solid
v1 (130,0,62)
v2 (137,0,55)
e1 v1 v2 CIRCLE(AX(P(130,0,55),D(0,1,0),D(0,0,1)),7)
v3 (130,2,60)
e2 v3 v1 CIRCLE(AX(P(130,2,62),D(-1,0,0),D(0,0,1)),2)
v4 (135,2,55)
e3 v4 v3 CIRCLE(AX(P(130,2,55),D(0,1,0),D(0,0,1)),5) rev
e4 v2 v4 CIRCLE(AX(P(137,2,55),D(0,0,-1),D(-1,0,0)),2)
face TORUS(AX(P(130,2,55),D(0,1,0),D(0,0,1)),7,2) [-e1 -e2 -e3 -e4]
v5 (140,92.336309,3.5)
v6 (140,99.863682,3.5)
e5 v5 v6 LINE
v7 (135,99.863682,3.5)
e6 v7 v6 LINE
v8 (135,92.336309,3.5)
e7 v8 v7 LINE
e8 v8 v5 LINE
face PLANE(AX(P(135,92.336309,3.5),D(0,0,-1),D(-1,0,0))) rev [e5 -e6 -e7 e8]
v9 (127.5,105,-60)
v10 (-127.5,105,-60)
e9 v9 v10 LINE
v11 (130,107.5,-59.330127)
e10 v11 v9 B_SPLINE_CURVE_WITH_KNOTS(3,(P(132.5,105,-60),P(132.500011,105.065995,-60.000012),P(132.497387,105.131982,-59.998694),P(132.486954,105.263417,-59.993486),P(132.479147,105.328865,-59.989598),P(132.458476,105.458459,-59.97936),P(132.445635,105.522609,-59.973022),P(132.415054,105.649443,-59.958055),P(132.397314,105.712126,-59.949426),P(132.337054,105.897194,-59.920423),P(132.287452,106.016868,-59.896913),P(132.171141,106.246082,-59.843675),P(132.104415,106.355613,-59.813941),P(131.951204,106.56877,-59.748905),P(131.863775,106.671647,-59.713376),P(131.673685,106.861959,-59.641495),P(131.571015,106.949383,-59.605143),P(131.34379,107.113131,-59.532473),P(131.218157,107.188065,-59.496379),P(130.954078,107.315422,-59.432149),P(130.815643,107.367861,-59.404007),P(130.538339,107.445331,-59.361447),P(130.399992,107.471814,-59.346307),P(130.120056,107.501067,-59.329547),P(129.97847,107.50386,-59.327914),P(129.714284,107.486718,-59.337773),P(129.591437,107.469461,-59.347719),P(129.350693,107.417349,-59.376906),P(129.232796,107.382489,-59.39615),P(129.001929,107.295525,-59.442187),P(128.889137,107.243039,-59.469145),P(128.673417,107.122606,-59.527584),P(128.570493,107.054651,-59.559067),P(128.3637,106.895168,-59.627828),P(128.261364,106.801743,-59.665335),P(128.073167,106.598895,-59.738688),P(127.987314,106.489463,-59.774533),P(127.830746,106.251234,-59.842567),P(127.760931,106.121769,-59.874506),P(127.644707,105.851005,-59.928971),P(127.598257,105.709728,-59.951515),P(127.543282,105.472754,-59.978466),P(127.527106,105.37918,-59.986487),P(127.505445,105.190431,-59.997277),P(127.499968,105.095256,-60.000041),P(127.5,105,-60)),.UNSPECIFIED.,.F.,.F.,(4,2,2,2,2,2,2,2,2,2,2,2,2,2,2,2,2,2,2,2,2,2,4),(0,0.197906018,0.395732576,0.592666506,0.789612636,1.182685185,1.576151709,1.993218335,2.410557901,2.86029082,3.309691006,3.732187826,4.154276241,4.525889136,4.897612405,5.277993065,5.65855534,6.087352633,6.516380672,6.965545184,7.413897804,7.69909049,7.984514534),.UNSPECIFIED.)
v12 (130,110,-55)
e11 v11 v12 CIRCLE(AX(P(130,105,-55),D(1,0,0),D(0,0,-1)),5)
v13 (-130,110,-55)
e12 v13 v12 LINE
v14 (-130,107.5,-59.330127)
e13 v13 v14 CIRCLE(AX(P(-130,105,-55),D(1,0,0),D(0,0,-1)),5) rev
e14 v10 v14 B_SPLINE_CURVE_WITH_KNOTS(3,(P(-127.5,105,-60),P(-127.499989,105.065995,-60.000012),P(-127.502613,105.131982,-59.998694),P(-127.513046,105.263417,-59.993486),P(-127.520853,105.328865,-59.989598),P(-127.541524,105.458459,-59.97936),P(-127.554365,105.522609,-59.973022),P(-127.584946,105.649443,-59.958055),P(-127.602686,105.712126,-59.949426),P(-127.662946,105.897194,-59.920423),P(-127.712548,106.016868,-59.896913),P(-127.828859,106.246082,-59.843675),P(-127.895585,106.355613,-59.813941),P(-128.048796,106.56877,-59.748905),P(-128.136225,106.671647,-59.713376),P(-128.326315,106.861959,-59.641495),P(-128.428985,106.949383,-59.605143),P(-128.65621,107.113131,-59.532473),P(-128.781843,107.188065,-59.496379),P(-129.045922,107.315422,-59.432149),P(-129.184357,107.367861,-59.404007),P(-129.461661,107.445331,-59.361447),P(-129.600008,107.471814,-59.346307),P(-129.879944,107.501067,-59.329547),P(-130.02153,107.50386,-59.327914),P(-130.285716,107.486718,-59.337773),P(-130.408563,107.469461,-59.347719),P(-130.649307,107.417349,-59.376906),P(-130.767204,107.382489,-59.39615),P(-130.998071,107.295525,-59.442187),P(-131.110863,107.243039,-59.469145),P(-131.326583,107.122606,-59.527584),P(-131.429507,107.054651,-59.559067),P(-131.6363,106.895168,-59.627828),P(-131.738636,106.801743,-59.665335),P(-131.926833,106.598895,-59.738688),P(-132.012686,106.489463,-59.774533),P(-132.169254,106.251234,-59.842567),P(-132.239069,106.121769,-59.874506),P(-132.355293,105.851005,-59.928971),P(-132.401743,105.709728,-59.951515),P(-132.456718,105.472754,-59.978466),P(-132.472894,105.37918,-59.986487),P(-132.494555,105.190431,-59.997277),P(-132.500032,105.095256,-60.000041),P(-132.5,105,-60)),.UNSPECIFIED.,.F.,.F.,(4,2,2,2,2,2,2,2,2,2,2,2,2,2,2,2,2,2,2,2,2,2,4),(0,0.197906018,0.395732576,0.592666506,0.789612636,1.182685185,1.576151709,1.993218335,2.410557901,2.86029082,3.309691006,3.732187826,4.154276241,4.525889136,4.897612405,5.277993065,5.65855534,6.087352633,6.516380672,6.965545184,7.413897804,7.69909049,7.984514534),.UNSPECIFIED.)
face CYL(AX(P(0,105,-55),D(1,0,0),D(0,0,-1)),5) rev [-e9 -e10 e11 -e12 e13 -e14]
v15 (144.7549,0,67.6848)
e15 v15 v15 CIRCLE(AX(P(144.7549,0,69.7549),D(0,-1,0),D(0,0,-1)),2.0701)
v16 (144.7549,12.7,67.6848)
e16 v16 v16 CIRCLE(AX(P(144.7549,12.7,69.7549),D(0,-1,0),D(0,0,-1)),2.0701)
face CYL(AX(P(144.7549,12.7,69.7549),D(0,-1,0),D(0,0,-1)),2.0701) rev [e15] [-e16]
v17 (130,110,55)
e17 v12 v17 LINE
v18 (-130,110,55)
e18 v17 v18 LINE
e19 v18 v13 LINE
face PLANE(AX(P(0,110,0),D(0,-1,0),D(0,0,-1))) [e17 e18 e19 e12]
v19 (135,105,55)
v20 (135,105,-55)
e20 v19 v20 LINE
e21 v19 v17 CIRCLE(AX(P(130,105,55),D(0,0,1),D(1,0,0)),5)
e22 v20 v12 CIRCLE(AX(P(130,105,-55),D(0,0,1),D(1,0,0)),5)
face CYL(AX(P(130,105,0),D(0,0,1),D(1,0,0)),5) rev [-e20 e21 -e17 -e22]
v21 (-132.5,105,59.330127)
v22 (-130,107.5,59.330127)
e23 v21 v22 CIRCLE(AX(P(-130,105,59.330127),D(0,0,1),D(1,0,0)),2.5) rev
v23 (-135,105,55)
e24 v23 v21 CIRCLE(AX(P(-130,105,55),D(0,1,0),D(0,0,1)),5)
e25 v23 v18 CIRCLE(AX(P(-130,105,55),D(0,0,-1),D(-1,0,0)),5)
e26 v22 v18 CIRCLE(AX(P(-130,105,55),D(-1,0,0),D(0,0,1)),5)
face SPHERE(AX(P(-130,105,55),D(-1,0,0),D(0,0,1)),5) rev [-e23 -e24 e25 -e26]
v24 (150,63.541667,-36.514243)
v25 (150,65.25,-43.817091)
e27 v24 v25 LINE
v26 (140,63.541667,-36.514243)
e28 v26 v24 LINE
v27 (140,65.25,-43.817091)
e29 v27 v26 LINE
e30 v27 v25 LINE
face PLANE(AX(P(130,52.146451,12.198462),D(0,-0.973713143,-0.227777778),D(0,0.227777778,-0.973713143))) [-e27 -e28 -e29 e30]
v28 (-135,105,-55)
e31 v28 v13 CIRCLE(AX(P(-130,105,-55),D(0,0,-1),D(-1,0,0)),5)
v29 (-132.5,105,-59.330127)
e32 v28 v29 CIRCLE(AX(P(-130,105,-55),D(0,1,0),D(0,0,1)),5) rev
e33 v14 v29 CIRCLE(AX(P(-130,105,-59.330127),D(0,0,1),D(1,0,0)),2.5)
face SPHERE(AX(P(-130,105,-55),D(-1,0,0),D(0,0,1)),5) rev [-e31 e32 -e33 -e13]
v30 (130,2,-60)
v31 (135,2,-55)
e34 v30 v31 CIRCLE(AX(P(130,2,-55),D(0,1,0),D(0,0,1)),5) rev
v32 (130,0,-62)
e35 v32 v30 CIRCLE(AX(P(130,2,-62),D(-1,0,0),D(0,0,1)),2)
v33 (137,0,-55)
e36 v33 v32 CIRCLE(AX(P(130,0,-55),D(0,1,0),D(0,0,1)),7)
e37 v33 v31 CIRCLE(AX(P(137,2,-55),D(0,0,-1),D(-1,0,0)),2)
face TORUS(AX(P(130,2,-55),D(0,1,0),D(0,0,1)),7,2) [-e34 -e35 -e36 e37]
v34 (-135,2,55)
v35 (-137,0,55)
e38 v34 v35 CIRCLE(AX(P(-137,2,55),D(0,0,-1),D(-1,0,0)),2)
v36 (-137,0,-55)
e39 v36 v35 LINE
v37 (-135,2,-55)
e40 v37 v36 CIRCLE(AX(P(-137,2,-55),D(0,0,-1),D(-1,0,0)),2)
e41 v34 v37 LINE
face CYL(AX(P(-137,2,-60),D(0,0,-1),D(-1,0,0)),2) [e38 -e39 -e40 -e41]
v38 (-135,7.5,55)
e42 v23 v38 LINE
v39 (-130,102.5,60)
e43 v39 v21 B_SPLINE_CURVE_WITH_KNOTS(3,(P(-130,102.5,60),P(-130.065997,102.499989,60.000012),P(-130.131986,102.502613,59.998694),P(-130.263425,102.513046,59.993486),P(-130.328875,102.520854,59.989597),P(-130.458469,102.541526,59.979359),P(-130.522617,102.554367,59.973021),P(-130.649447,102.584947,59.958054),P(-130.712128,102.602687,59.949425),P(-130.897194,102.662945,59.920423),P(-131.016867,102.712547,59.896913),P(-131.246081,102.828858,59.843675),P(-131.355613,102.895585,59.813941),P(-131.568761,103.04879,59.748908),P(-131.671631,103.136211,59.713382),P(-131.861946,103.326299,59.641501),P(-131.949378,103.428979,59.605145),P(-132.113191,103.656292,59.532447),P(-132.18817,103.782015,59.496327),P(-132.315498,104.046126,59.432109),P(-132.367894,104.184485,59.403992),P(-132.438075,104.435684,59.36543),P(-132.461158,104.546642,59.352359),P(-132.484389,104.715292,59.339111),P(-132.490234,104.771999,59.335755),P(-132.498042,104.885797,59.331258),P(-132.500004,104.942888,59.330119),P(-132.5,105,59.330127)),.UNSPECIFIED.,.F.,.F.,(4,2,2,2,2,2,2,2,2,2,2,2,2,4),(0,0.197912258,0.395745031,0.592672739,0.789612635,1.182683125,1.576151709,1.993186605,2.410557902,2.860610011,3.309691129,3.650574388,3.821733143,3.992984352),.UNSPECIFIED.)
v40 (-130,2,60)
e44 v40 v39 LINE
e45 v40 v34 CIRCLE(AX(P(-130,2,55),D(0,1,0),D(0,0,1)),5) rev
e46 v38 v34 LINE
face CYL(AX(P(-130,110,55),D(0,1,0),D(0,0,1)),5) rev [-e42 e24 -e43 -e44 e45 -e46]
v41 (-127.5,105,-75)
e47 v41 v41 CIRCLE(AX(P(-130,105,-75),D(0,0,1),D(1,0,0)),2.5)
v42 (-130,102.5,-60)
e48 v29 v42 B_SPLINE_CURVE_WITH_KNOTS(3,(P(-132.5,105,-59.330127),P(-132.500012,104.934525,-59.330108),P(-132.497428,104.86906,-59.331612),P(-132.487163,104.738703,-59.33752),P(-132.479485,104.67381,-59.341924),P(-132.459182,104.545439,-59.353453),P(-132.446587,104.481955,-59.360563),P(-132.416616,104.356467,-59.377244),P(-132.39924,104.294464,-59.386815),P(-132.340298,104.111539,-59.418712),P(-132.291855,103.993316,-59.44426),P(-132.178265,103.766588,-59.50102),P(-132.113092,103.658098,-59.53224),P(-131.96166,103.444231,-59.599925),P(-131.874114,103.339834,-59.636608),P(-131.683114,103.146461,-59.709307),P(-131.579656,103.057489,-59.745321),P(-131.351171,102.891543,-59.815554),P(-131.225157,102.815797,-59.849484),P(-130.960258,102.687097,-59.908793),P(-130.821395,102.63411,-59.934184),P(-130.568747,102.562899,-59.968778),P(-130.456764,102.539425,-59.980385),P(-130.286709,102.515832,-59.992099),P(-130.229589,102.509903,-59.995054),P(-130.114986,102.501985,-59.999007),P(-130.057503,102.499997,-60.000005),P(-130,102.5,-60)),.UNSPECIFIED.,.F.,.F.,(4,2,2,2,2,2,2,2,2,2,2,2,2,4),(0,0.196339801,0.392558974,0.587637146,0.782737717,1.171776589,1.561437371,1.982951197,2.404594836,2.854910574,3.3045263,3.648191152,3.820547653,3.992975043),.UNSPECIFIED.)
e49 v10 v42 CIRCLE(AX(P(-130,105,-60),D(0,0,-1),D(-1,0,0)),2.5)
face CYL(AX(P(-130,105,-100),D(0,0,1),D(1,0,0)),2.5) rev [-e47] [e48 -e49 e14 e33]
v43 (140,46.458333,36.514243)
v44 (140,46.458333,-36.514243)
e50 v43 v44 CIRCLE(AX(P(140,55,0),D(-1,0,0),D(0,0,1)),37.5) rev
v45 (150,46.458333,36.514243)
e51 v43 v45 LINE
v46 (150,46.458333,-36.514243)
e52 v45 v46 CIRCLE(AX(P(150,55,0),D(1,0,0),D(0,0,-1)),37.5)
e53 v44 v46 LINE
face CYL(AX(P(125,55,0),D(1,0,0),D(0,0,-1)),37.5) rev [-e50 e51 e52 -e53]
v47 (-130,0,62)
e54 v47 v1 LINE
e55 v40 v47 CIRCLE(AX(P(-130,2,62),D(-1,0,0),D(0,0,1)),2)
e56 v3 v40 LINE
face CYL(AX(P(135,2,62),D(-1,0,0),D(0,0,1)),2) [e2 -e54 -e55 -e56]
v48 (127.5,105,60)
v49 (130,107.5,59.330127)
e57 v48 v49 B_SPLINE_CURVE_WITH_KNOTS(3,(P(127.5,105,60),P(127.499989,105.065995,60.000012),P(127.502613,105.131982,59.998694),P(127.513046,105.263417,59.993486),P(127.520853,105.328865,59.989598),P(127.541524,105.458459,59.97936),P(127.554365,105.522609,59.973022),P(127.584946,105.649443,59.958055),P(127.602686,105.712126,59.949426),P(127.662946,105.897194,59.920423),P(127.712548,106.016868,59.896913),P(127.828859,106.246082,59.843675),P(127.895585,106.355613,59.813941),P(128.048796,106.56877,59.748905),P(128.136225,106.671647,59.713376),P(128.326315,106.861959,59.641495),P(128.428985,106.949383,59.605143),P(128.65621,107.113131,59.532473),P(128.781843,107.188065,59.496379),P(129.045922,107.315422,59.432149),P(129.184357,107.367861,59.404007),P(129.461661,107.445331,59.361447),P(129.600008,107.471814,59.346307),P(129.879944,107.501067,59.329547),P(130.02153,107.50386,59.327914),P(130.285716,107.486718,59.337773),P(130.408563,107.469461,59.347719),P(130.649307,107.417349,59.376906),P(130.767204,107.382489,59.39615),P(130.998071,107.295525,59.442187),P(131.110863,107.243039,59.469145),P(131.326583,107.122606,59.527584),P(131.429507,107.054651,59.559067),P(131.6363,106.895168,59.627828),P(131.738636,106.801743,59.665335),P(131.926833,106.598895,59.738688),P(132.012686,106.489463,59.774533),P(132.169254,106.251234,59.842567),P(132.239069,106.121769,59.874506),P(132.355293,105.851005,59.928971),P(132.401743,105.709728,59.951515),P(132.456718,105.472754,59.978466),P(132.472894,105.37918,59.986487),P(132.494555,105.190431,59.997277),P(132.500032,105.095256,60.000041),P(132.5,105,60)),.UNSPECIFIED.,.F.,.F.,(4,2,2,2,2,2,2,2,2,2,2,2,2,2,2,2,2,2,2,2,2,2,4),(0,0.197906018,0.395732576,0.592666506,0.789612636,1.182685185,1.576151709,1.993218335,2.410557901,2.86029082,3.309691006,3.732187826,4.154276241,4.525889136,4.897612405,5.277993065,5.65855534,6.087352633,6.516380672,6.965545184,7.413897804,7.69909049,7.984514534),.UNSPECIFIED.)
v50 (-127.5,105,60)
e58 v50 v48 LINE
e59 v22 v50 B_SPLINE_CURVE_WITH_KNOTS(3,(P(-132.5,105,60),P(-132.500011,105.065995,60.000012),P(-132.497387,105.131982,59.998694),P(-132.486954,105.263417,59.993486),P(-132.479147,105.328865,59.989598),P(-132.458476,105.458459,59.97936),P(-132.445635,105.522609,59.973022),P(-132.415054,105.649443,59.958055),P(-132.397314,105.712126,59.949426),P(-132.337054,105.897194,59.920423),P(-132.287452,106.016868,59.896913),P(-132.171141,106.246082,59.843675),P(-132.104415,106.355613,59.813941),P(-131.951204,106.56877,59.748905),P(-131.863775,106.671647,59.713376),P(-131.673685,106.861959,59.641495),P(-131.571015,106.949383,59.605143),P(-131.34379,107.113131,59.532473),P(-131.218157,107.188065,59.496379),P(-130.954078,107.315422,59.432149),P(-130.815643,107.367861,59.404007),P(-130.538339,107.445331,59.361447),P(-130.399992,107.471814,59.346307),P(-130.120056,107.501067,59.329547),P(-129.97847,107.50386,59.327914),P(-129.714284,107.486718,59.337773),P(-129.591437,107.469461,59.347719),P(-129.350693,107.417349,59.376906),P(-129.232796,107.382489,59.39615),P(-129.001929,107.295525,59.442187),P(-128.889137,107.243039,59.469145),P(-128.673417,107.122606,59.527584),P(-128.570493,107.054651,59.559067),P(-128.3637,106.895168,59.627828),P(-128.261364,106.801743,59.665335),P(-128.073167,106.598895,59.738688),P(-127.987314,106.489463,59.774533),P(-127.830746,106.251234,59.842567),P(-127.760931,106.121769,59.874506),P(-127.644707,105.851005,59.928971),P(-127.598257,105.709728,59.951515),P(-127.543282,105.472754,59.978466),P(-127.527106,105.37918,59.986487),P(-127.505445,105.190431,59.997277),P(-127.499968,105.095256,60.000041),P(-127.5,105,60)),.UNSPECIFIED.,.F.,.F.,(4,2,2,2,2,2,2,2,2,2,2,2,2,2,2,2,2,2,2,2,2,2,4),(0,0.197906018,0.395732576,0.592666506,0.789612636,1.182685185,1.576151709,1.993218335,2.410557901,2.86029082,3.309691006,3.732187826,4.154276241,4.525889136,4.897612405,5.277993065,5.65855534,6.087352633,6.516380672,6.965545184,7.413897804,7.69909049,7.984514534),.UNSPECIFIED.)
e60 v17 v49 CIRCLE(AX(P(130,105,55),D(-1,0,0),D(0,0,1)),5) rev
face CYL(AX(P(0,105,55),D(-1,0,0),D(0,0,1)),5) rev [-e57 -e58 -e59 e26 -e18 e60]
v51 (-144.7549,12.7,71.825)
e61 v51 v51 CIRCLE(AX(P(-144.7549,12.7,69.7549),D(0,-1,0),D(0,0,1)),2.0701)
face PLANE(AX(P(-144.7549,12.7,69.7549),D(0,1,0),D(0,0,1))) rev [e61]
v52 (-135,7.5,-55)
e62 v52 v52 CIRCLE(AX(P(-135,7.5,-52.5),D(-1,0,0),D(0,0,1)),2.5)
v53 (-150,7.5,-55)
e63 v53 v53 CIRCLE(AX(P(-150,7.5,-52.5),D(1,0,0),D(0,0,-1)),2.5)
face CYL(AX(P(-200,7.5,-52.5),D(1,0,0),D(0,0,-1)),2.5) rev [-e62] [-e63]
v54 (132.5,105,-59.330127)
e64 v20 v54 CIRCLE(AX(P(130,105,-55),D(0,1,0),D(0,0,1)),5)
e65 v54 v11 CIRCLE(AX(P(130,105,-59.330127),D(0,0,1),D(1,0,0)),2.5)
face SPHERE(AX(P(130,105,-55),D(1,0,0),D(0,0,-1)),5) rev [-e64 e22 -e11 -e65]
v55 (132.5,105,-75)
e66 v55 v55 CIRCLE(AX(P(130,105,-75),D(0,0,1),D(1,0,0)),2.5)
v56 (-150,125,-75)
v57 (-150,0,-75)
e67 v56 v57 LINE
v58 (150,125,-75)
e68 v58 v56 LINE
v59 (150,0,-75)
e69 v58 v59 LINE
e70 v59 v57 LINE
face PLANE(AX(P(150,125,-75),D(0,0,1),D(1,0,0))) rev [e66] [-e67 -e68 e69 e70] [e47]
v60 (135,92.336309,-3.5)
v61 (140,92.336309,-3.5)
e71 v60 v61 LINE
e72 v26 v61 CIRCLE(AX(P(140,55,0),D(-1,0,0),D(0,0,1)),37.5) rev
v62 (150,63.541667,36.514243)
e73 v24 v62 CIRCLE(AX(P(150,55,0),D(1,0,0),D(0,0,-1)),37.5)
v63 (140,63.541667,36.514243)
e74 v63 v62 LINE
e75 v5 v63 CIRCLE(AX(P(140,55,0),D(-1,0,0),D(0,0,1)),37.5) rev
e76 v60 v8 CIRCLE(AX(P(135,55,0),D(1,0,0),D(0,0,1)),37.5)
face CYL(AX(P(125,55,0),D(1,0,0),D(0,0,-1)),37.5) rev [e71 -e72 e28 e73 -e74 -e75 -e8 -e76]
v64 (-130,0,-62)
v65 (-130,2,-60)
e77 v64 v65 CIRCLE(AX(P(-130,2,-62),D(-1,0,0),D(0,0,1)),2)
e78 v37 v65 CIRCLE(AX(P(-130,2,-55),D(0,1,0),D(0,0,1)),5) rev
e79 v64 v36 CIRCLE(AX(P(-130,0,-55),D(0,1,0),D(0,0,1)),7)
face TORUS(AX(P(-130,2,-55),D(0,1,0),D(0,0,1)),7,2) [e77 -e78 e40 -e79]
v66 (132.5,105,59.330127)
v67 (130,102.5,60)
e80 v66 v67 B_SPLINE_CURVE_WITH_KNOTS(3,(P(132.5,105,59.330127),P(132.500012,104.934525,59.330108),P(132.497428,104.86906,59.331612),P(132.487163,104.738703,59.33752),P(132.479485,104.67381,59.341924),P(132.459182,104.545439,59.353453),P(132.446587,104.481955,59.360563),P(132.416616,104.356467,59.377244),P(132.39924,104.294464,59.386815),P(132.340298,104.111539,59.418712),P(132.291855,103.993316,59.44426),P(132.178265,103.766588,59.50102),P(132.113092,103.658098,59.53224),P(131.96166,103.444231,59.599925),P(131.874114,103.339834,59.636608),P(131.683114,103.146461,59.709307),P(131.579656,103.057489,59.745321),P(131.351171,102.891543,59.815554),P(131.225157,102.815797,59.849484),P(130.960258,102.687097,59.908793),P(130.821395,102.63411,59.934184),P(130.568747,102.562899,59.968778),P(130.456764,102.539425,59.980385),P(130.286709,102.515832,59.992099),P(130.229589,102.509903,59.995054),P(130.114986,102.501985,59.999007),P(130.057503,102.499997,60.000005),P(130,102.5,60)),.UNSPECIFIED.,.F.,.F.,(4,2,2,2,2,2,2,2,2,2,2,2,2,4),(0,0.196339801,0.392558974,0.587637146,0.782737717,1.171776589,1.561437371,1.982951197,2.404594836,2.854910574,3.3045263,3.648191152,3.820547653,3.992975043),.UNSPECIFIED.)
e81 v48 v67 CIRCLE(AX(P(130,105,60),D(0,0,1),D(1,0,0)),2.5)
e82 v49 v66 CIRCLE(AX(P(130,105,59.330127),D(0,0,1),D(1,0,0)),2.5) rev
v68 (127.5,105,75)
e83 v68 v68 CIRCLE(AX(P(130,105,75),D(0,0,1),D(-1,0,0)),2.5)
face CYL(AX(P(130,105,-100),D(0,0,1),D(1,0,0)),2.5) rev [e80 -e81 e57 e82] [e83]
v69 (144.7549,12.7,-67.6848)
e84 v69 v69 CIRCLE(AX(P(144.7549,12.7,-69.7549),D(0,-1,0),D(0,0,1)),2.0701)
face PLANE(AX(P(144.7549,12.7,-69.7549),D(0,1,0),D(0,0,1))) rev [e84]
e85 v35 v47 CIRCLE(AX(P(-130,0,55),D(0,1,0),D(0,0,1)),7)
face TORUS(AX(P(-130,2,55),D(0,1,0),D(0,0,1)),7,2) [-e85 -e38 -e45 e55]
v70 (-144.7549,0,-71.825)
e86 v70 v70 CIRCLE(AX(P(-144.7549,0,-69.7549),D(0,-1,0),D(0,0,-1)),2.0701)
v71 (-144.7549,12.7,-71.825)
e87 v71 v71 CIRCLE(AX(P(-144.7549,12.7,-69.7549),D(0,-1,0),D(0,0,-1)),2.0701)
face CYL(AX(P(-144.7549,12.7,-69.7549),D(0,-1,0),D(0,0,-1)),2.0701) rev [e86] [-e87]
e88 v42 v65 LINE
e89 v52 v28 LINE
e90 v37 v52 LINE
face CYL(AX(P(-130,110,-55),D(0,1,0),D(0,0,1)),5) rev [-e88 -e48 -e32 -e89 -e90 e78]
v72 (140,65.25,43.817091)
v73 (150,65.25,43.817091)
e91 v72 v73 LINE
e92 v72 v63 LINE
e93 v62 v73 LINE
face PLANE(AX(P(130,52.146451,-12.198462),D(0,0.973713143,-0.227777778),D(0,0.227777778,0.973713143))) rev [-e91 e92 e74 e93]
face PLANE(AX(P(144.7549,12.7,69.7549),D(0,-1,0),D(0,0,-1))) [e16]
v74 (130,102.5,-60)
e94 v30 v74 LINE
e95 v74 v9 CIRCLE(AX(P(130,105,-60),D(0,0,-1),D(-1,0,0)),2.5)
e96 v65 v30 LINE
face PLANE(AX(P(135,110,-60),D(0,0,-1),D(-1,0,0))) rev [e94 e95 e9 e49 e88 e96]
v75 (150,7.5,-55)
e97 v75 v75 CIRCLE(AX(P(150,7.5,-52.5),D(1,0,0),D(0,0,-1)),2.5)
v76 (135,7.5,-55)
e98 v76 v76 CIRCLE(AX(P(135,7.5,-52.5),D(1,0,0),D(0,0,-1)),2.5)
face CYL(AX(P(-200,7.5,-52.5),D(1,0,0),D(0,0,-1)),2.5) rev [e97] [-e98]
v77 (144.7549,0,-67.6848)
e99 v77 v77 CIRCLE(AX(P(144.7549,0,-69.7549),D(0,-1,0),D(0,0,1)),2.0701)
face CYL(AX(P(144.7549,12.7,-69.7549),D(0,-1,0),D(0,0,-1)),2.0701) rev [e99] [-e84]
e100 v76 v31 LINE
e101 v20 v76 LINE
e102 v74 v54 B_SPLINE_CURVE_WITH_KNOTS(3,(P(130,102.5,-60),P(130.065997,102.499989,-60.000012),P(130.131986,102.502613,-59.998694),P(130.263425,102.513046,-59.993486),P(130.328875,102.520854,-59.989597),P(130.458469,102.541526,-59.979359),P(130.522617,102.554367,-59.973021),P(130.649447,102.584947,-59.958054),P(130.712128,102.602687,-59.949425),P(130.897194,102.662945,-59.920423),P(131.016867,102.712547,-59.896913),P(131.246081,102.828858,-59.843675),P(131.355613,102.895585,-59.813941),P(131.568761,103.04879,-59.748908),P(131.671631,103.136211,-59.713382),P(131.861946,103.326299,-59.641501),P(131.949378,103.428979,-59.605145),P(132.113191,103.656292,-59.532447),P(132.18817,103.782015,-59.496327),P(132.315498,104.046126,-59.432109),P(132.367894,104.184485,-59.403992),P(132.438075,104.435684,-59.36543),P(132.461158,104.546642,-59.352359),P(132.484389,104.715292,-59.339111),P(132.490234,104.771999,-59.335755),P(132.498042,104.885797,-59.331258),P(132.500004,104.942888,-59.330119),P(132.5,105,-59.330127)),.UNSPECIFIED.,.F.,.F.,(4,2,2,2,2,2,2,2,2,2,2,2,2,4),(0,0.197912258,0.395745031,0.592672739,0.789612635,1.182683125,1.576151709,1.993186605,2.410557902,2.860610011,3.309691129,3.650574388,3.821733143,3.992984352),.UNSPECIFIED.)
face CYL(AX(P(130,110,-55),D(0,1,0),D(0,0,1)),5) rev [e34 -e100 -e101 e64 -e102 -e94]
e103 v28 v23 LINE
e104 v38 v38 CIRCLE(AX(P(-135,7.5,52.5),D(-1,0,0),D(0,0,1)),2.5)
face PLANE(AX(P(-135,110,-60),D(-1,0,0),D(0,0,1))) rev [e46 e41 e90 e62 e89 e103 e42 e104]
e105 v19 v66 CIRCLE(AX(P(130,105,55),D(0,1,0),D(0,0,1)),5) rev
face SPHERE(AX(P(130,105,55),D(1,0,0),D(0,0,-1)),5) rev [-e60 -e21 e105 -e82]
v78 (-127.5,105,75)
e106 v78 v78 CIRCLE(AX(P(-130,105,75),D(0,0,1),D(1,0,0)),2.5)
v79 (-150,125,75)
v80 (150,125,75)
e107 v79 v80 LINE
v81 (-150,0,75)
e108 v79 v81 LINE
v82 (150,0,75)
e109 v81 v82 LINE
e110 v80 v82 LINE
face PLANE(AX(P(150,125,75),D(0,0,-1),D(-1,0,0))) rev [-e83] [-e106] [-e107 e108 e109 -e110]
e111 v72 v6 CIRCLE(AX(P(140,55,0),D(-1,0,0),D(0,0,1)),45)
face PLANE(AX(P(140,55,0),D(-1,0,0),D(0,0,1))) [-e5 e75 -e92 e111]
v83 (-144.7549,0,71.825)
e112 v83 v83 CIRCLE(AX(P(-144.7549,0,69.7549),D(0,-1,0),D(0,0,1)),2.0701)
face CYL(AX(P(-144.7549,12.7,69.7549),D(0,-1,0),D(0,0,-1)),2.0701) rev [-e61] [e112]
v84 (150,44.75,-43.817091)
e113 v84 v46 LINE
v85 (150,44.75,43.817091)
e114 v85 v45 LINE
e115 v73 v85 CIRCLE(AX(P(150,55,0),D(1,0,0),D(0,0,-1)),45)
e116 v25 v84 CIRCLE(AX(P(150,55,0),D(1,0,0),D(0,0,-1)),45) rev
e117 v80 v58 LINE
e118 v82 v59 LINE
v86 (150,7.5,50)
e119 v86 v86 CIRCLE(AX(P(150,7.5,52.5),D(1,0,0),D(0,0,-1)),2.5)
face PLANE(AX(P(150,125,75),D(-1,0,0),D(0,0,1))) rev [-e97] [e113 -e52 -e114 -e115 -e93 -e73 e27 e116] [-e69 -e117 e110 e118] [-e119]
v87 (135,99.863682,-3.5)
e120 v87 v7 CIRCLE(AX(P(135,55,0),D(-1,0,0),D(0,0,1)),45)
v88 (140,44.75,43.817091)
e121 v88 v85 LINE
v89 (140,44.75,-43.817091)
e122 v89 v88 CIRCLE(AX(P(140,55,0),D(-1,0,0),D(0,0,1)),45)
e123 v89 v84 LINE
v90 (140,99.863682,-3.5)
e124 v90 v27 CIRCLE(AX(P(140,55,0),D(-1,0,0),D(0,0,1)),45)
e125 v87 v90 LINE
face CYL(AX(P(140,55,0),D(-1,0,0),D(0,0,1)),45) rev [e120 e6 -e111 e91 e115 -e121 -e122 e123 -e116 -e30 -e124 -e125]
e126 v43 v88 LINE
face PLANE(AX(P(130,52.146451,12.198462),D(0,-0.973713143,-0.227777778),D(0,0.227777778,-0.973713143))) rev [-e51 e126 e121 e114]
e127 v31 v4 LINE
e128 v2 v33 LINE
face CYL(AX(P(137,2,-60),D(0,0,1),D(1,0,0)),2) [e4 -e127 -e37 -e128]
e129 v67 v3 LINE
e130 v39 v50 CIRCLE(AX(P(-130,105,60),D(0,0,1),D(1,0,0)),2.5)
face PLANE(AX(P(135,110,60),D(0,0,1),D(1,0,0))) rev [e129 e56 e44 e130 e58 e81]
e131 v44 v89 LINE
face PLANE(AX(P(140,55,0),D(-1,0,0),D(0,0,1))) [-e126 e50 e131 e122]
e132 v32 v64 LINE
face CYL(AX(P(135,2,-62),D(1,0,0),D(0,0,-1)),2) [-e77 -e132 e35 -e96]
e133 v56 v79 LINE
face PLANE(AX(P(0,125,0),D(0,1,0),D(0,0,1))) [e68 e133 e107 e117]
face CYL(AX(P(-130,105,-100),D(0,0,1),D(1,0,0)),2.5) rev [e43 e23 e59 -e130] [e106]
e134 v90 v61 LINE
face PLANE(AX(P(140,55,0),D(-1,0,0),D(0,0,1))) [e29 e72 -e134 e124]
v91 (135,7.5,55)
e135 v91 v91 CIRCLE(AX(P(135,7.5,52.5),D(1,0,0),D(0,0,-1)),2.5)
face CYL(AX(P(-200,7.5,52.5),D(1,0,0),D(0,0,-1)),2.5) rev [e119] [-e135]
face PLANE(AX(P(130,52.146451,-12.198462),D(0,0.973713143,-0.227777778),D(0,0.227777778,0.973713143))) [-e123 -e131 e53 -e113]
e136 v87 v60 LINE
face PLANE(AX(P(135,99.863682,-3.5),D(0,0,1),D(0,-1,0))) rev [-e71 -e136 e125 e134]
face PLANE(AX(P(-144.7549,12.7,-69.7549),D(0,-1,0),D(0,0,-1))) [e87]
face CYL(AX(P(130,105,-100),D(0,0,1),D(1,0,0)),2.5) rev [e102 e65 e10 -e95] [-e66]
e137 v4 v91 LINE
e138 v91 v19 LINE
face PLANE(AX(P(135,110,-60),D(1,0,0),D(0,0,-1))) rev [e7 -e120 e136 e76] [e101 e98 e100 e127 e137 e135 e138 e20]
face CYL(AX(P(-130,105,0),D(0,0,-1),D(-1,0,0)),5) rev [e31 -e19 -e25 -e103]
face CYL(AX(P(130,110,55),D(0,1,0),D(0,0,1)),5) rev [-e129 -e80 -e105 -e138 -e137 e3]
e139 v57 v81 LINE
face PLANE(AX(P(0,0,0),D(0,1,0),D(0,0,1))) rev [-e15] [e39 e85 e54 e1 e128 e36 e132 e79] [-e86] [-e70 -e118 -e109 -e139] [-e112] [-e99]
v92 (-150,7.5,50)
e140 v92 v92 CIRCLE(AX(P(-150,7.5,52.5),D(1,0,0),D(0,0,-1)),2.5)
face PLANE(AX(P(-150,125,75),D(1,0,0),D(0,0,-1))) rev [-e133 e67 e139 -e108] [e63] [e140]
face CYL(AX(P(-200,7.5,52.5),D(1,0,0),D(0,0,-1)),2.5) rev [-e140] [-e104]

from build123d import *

# Parameters (mm, degrees)
SKETCH1_W           = 300
SKETCH1_H           = 150
BOSS_EXTRUDE1_DEPTH = 125
SKETCH2_W           = 270
SKETCH2_H           = 120
CUT_EXTRUDE1_DEPTH  = 110
SKETCH4_R           = 2.5
CUT_EXTRUDE5_DEPTH  = 350
SKETCH6_R           = 2.5
CUT_EXTRUDE6_DEPTH  = 175
FILLET1_R           = 5
FILLET2_R           = 5
FILLET3_R           = 5
FILLET4_R           = 5
FILLET5_R           = 2
SKETCH7_R           = 37.5
CUT_EXTRUDE7_DEPTH  = 25
SKETCH8_R           = 45
CUT_EXTRUDE8_DEPTH  = 5
SKETCH9_R           = 37.5
CUT_EXTRUDE9_DEPTH  = 20
BOSS_EXTRUDE2_DEPTH = 5
SKETCH12_R          = 2.0701
CUT_EXTRUDE10_DEPTH = 12.7


with BuildPart() as part:
    # Sketch1 → Boss-Extrude1 (new body)
    with BuildSketch(Plane(origin=(0, 0, 0), x_dir=(1, 0, 0), z_dir=(0, 1, 0))):
        Rectangle(SKETCH1_W, SKETCH1_H)
    extrude(amount=BOSS_EXTRUDE1_DEPTH)

    # Sketch2 → Cut-Extrude1 (cut)
    with BuildSketch(Plane.XZ):
        Rectangle(SKETCH2_W, SKETCH2_H)
    extrude(amount=-CUT_EXTRUDE1_DEPTH, mode=Mode.SUBTRACT)

    # Sketch4 → Cut-Extrude5 (cut)
    with BuildSketch(Plane(origin=(150, 0, 0), x_dir=(0, 0, -1), z_dir=(1, 0, 0))):
        with Locations((-52.5, 7.5)):
            Circle(SKETCH4_R)
        with Locations((52.5, 7.5)):
            Circle(SKETCH4_R)
    extrude(amount=-CUT_EXTRUDE5_DEPTH, mode=Mode.SUBTRACT)

    # Sketch6 → Cut-Extrude6 (cut)
    with BuildSketch(Plane.XY.offset(75)):
        with Locations((-130, 105)):
            Circle(SKETCH6_R)
        with Locations((130, 105)):
            Circle(SKETCH6_R)
    extrude(amount=-CUT_EXTRUDE6_DEPTH, mode=Mode.SUBTRACT)

    # Fillet1
    # the kernel refuses this fillet: 5 mm, written as the material it adds along each edge
    with BuildSketch(Plane(origin=(147.5, 110, -60), x_dir=(0, -1, 0), z_dir=(-1, 0, 0))) as fillet1_piece_1_section:
        with BuildLine():
            CenterArc((FILLET1_R, FILLET1_R), FILLET1_R, 180, 90)
            Line((0, FILLET1_R), (0, 0))
            Line((0, 0), (FILLET1_R, 0))
        make_face()
    fillet1_piece_1 = extrude(amount=295, mode=Mode.PRIVATE)
    fillet1_piece_1 = fillet1_piece_1 - Plane(origin=(130, 105, -58.868024429), x_dir=(1, 0, 0), z_dir=(0, 0, 1)) * Cylinder(2.5, 610, mode=Mode.PRIVATE)
    fillet1_piece_1 = fillet1_piece_1 - Plane(origin=(-130, 105, -58.868024429), x_dir=(1, 0, 0), z_dir=(0, 0, 1)) * Cylinder(2.5, 610, mode=Mode.PRIVATE)
    add(fillet1_piece_1)

    # Fillet2
    # the kernel refuses this fillet: 5 mm, written as the material it adds along each edge
    with BuildSketch(Plane(origin=(-147.5, 110, 60), x_dir=(0, 0, -1), z_dir=(1, 0, 0))) as fillet2_piece_1_section:
        with BuildLine():
            CenterArc((FILLET2_R, -FILLET2_R), FILLET2_R, 90, 90)
            Line((0, -FILLET2_R), (0, 0))
            Line((0, 0), (FILLET2_R, 0))
        make_face()
    fillet2_piece_1 = extrude(amount=295, mode=Mode.PRIVATE)
    fillet2_piece_1 = fillet2_piece_1 - Plane(origin=(-130, 105, 58.868024429), x_dir=(1, 0, 0), z_dir=(0, 0, 1)) * Cylinder(2.5, 610, mode=Mode.PRIVATE)
    fillet2_piece_1 = fillet2_piece_1 - Plane(origin=(130, 105, 58.868024429), x_dir=(1, 0, 0), z_dir=(0, 0, 1)) * Cylinder(2.5, 610, mode=Mode.PRIVATE)
    add(fillet2_piece_1)

    # Fillet3
    # the kernel refuses this fillet: 5 mm, written as the material it adds along each edge
    with BuildSketch(Plane(origin=(-135, 0, 60), x_dir=(0, 0, -1), z_dir=(0, 1, 0))) as fillet3_piece_1_section:
        with BuildLine():
            CenterArc((FILLET3_R, -FILLET3_R), FILLET3_R, 90, 90)
            Line((0, -FILLET3_R), (0, 0))
            Line((0, 0), (FILLET3_R, 0))
        make_face()
    fillet3_piece_1 = extrude(amount=105, mode=Mode.PRIVATE)
    fillet3_piece_1 = fillet3_piece_1 - Plane(origin=(-130, 105, 58.86600748), x_dir=(1, 0, 0), z_dir=(0, 0, 1)) * Cylinder(2.5, 230, mode=Mode.PRIVATE)
    add(fillet3_piece_1)
    with BuildSketch(Plane(origin=(-135, 105, 55), x_dir=(0, 0, 1), z_dir=(0, -1, 0))) as fillet3_piece_2_section:
        with BuildLine():
            CenterArc((5 - FILLET3_R, -FILLET3_R), FILLET3_R, 0, 90)
            Line((5 - FILLET3_R, 0), (5, 0))
            Line((5, 0), (5, -FILLET3_R))
        make_face()
    fillet3_piece_2 = revolve(axis=Axis((-135, 105, 55), (-1, 0, 0)), revolution_arc=90, mode=Mode.PRIVATE)
    fillet3_piece_2 = fillet3_piece_2 - Plane(origin=(-130, 105, 57.577819165), x_dir=(1, 0, 0), z_dir=(0, 0, 1)) * Cylinder(2.5, 20, mode=Mode.PRIVATE)
    add(fillet3_piece_2)
    with BuildSketch(Plane(origin=(-135, 0, -60), x_dir=(0, 0, 1), z_dir=(0, 1, 0))) as fillet3_piece_3_section:
        with BuildLine():
            CenterArc((FILLET3_R, FILLET3_R), FILLET3_R, 180, 90)
            Line((0, FILLET3_R), (0, 0))
            Line((0, 0), (FILLET3_R, 0))
        make_face()
    fillet3_piece_3 = extrude(amount=105, mode=Mode.PRIVATE)
    fillet3_piece_3 = fillet3_piece_3 - Plane(origin=(-130, 105, -58.86600748), x_dir=(1, 0, 0), z_dir=(0, 0, 1)) * Cylinder(2.5, 231, mode=Mode.PRIVATE)
    add(fillet3_piece_3)
    with BuildSketch(Plane(origin=(-135, 105, -55), x_dir=(0, 0, -1), z_dir=(0, -1, 0))) as fillet3_piece_4_section:
        with BuildLine():
            CenterArc((5 - FILLET3_R, FILLET3_R), FILLET3_R, 270, 90)
            Line((5, FILLET3_R), (5, 0))
            Line((5, 0), (5 - FILLET3_R, 0))
        make_face()
    fillet3_piece_4 = revolve(axis=Axis((-135, 105, -55), (1, 0, 0)), revolution_arc=90, mode=Mode.PRIVATE)
    fillet3_piece_4 = fillet3_piece_4 - Plane(origin=(-130, 105, -57.577819165), x_dir=(1, 0, 0), z_dir=(0, 0, 1)) * Cylinder(2.5, 20, mode=Mode.PRIVATE)
    add(fillet3_piece_4)
    with BuildSketch(Plane(origin=(-135, 110, -55), x_dir=(0, -1, 0), z_dir=(0, 0, 1))) as fillet3_piece_5:
        with BuildLine():
            CenterArc((FILLET3_R, FILLET3_R), FILLET3_R, 180, 90)
            Line((0, FILLET3_R), (0, 0))
            Line((0, 0), (FILLET3_R, 0))
        make_face()
    extrude(amount=110)

    # Fillet4
    # the kernel refuses this fillet: 5 mm, written as the material it adds along each edge
    with BuildSketch(Plane(origin=(135, 0, -60), x_dir=(0, 0, 1), z_dir=(0, 1, 0))) as fillet4_piece_1_section:
        with BuildLine():
            CenterArc((FILLET4_R, -FILLET4_R), FILLET4_R, 90, 90)
            Line((0, -FILLET4_R), (0, 0))
            Line((0, 0), (FILLET4_R, 0))
        make_face()
    fillet4_piece_1 = extrude(amount=105, mode=Mode.PRIVATE)
    fillet4_piece_1 = fillet4_piece_1 - Plane(origin=(130, 105, -58.866007422), x_dir=(1, 0, 0), z_dir=(0, 0, 1)) * Cylinder(2.5, 231, mode=Mode.PRIVATE)
    add(fillet4_piece_1)
    with BuildSketch(Plane(origin=(135, 105, -55), x_dir=(0, 0, -1), z_dir=(0, -1, 0))) as fillet4_piece_2_section:
        with BuildLine():
            CenterArc((5 - FILLET4_R, -FILLET4_R), FILLET4_R, 0, 90)
            Line((5 - FILLET4_R, 0), (5, 0))
            Line((5, 0), (5, -FILLET4_R))
        make_face()
    fillet4_piece_2 = revolve(axis=Axis((135, 105, -55), (1, 0, 0)), revolution_arc=90, mode=Mode.PRIVATE)
    fillet4_piece_2 = fillet4_piece_2 - Plane(origin=(130, 105, -57.577819011), x_dir=(1, 0, 0), z_dir=(0, 0, 1)) * Cylinder(2.5, 20, mode=Mode.PRIVATE)
    add(fillet4_piece_2)
    with BuildSketch(Plane(origin=(135, 0, 60), x_dir=(0, 0, -1), z_dir=(0, 1, 0))) as fillet4_piece_3_section:
        with BuildLine():
            CenterArc((FILLET4_R, FILLET4_R), FILLET4_R, 180, 90)
            Line((0, FILLET4_R), (0, 0))
            Line((0, 0), (FILLET4_R, 0))
        make_face()
    fillet4_piece_3 = extrude(amount=105, mode=Mode.PRIVATE)
    fillet4_piece_3 = fillet4_piece_3 - Plane(origin=(130, 105, 58.866007422), x_dir=(1, 0, 0), z_dir=(0, 0, 1)) * Cylinder(2.5, 231, mode=Mode.PRIVATE)
    add(fillet4_piece_3)
    with BuildSketch(Plane(origin=(135, 105, 55), x_dir=(0, 0, 1), z_dir=(0, -1, 0))) as fillet4_piece_4_section:
        with BuildLine():
            CenterArc((5 - FILLET4_R, FILLET4_R), FILLET4_R, 270, 90)
            Line((5, FILLET4_R), (5, 0))
            Line((5, 0), (5 - FILLET4_R, 0))
        make_face()
    fillet4_piece_4 = revolve(axis=Axis((135, 105, 55), (-1, 0, 0)), revolution_arc=90, mode=Mode.PRIVATE)
    fillet4_piece_4 = fillet4_piece_4 - Plane(origin=(130, 105, 57.577819011), x_dir=(1, 0, 0), z_dir=(0, 0, 1)) * Cylinder(2.5, 20, mode=Mode.PRIVATE)
    add(fillet4_piece_4)
    with BuildSketch(Plane(origin=(135, 110, 55), x_dir=(-1, 0, 0), z_dir=(0, 0, -1))) as fillet4_piece_5:
        with BuildLine():
            CenterArc((FILLET4_R, -FILLET4_R), FILLET4_R, 90, 90)
            Line((0, -FILLET4_R), (0, 0))
            Line((0, 0), (FILLET4_R, 0))
        make_face()
    extrude(amount=110)

    # Fillet5
    fillet5_edges = [part.edges().sort_by_distance(p)[0] for p in [
        (-133.535533906, 0, 58.535533906),
        (-133.535533906, 0, -58.535533906),
        (135, 0, 0),
        (0, 0, 60),
        (133.535533906, 0, -58.535533906),
        (133.535533906, 0, 58.535533906),
        (-135, 0, 0),
        (0, 0, -60),
    ]]
    fillet(fillet5_edges, radius=FILLET5_R)

    # Sketch7 → Cut-Extrude7 (cut)
    with BuildSketch(Plane(origin=(150, 0, 0), x_dir=(0, 0, -1), z_dir=(1, 0, 0))):
        with Locations((0, 55)):
            Circle(SKETCH7_R)
    extrude(amount=-CUT_EXTRUDE7_DEPTH, mode=Mode.SUBTRACT)

    # Sketch8 → Cut-Extrude8 (cut)
    with BuildSketch(Plane.ZY.offset(-135)):
        with Locations((0, 55)):
            Circle(SKETCH8_R)
    extrude(amount=-CUT_EXTRUDE8_DEPTH, mode=Mode.SUBTRACT)

    # Sketch9 → Cut-Extrude9 (cut)
    with BuildSketch(Plane(origin=(150, 0, 0), x_dir=(0, 0, -1), z_dir=(1, 0, 0))):
        with Locations((0, 55)):
            Circle(SKETCH9_R)
        with BuildLine():
            Line((0, 55), (-43.817091414, 65.25))
            ThreePointArc((-43.817091414, 65.25), (-45, 55), (-43.817091414, 44.75))
            Line((-43.817091414, 44.75), (0, 55))
        make_face()
        with BuildLine():
            ThreePointArc((43.817091414, 65.25), (45, 55), (43.817091414, 44.75))
            Line((43.817091414, 44.75), (0, 55))
            Line((0, 55), (43.817091414, 65.25))
        make_face()
    extrude(amount=-CUT_EXTRUDE9_DEPTH, mode=Mode.SUBTRACT)

    # Sketch10 → Boss-Extrude2 (add)
    with BuildSketch(Plane.ZY.offset(-140)):
        with BuildLine():
            Line((-3.5, 99.863682417), (-3.5, 92.336309405))
            ThreePointArc((-3.5, 92.336309405), (0, 92.5), (3.5, 92.336309405))
            Line((3.5, 92.336309405), (3.5, 99.863682417))
            ThreePointArc((3.5, 99.863682417), (0, 100), (-3.5, 99.863682417))
        make_face()
    extrude(amount=BOSS_EXTRUDE2_DEPTH)

    # Sketch12 → Cut-Extrude10 (cut)
    with BuildSketch(Plane.XZ):
        with Locations(Location((144.7549, 69.7549, 0), (0, 0, 270))):
            Circle(SKETCH12_R)
        with Locations(Location((144.7549, -69.7549, 0), (0, 0, 90))):
            Circle(SKETCH12_R)
        with Locations(Location((-144.7549, -69.7549, 0), (0, 0, 270))):
            Circle(SKETCH12_R)
        with Locations(Location((-144.7549, 69.7549, 0), (0, 0, 90))):
            Circle(SKETCH12_R)
    extrude(amount=-CUT_EXTRUDE10_DEPTH, mode=Mode.SUBTRACT)


solid = part.part
